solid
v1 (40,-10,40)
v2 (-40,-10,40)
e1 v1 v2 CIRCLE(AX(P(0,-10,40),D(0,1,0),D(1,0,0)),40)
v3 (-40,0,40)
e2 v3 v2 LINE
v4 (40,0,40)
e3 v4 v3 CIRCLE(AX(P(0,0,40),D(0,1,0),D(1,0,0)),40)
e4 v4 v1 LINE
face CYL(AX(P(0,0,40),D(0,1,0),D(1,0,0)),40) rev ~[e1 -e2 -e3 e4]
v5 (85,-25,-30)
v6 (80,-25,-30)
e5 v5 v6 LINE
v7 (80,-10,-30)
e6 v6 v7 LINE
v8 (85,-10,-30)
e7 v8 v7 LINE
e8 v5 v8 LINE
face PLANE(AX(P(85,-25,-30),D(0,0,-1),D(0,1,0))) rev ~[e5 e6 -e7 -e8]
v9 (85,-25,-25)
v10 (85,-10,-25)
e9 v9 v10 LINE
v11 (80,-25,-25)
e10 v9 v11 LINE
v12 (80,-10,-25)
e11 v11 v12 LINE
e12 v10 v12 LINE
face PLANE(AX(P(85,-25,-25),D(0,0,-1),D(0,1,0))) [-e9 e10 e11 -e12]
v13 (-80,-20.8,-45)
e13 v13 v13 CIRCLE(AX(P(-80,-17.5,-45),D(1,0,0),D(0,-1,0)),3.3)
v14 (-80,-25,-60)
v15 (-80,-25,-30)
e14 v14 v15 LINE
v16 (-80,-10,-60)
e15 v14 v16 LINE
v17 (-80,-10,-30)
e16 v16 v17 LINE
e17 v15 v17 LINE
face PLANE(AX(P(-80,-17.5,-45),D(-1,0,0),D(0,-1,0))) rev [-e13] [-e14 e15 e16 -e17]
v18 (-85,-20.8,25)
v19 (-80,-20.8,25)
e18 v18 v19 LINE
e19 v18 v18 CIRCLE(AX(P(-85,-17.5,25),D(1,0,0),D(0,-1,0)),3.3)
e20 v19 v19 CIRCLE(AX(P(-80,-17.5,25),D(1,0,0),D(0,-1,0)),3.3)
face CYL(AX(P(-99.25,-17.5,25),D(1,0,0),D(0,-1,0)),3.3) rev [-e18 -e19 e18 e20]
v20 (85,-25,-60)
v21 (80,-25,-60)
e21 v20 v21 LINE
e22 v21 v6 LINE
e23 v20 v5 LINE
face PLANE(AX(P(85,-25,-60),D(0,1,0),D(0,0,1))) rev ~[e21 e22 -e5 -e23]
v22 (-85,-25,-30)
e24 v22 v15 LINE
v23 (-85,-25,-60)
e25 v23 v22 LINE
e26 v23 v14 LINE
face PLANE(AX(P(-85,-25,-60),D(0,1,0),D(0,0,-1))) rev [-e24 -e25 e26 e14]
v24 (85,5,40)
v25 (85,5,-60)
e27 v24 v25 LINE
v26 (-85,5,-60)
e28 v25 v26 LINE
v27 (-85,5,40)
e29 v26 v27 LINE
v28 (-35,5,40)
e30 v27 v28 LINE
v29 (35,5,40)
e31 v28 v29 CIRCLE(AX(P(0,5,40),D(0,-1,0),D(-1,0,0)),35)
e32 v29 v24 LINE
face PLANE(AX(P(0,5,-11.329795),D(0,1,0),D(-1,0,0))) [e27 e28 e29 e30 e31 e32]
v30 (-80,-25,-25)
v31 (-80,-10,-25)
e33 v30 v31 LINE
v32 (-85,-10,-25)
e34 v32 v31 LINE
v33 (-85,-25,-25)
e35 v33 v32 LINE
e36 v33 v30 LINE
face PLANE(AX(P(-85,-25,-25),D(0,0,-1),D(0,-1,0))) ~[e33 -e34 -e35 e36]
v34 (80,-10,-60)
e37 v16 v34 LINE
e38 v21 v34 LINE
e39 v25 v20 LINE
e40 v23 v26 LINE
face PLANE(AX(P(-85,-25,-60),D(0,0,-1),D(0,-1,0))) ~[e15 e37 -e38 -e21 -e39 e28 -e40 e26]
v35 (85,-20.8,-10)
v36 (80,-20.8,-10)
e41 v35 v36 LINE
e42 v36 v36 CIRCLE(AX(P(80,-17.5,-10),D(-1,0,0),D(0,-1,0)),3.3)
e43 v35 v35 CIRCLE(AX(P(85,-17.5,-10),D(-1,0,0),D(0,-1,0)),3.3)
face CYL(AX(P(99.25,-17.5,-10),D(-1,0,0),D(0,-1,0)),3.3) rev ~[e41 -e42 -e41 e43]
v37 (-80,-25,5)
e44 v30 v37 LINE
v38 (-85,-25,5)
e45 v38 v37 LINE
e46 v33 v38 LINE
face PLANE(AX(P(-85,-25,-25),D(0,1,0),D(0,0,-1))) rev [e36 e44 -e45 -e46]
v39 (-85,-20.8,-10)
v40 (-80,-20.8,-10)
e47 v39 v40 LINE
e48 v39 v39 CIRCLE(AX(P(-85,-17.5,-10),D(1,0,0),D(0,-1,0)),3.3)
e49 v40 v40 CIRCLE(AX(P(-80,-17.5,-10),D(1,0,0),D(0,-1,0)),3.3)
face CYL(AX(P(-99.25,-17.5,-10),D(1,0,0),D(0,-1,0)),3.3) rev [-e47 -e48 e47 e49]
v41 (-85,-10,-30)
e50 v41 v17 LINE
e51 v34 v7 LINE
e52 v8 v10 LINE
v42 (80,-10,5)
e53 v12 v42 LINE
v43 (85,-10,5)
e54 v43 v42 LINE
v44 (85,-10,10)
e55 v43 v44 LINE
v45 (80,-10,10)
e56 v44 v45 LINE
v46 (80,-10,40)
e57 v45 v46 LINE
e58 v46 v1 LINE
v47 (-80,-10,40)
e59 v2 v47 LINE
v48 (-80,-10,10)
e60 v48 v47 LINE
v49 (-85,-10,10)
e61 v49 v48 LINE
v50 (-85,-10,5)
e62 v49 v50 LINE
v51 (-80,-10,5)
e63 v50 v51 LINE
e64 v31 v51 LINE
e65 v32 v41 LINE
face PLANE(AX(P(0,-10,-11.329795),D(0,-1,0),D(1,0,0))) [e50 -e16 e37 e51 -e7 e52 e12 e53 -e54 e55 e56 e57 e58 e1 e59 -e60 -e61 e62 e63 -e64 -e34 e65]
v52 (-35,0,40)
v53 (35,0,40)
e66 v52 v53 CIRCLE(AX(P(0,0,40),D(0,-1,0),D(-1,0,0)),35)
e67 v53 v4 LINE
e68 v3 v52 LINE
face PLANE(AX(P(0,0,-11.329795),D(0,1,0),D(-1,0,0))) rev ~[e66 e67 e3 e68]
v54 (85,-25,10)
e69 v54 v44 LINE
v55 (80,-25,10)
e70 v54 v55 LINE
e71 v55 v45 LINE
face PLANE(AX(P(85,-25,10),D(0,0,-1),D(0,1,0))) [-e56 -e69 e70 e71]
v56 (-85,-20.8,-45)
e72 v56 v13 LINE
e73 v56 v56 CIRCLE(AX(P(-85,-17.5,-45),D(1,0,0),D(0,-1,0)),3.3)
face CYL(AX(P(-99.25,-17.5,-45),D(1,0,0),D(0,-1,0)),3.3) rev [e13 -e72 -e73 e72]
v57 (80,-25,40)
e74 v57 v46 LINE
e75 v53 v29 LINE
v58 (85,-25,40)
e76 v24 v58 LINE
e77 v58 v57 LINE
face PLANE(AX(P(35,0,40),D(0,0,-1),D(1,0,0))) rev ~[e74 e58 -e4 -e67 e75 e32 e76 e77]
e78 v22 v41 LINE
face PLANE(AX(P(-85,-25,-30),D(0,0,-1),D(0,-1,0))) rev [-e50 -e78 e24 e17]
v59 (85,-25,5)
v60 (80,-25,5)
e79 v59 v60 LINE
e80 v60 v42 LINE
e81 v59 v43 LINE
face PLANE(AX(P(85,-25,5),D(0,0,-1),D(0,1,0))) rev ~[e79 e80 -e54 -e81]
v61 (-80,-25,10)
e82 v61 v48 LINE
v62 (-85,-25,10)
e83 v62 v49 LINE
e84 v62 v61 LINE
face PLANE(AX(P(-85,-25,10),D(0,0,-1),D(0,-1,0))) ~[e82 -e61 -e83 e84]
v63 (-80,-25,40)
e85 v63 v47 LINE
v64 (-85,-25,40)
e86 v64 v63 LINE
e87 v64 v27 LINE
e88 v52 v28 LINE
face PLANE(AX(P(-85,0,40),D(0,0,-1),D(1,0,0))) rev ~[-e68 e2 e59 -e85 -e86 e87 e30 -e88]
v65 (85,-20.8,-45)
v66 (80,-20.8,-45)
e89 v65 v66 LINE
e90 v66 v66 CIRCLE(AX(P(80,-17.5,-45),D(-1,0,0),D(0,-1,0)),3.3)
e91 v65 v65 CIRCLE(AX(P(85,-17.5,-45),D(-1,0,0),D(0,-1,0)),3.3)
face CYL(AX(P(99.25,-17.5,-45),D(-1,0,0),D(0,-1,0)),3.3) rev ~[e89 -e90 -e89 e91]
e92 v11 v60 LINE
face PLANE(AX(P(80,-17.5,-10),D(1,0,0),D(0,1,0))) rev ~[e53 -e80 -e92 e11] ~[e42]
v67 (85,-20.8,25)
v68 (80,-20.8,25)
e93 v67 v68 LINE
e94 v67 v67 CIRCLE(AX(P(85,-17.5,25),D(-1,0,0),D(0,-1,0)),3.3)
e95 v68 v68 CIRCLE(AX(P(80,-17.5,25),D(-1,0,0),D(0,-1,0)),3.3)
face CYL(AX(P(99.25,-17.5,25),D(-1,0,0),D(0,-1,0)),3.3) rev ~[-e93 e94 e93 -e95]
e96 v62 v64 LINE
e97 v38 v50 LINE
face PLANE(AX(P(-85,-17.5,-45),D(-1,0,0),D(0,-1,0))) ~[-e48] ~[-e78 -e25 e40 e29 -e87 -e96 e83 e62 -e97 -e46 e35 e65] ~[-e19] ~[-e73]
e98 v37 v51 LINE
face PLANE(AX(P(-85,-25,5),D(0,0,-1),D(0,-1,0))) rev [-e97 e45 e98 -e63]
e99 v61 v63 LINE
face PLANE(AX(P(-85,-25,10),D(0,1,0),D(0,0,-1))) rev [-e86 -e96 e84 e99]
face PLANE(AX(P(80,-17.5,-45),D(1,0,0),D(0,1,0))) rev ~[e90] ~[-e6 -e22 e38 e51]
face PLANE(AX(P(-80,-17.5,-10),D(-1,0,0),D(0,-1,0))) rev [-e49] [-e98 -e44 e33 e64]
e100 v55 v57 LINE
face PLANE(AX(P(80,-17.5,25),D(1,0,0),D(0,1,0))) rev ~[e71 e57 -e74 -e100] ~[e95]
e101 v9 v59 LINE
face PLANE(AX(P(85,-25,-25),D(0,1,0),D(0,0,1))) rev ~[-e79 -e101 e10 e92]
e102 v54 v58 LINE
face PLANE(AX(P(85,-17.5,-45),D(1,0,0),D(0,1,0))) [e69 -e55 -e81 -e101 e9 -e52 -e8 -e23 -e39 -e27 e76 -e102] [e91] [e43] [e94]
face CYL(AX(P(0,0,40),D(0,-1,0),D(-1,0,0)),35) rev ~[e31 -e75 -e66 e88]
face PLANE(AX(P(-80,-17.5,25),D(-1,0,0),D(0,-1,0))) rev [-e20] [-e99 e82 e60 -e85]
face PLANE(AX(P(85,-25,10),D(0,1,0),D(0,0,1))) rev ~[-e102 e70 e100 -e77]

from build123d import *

# Parameters (mm, degrees)
F1_DEPTH = 10
F3_DEPTH = 5
F4_W     = 15
F4_H     = 30
F5_DEPTH = 5
F6_D     = 6.6
F6_DEPTH = 14.25
F6_TIP   = 1.9828400428


# Not quite as in the source:
# - a pattern or mirror of a feature is missing from the dataset's text; its kind, count and spacing are read off the source's solid


with BuildPart() as f1:
    # F0 (on Front) → F1 (new body)
    with BuildSketch(Plane.XZ):
        with BuildLine():
            ThreePointArc((40, 40), (0, 0), (-40, 40))
            Line((-40, 40), (-85, 40))
            Line((-85, 40), (-85, -60))
            Line((-85, -60), (85, -60))
            Line((85, -60), (85, 40))
            Line((85, 40), (40, 40))
        make_face()
    extrude(amount=F1_DEPTH)

    # F2 (on face) → F3 (join)
    with BuildSketch(Plane(origin=(0, 0, 0), x_dir=(-1, 0, 0), z_dir=(0, 1, 0))):
        with BuildLine():
            ThreePointArc((40, 40), (0, 0), (-40, 40))
            Line((-40, 40), (-85, 40))
            Line((-85, 40), (-85, -60))
            Line((-85, -60), (85, -60))
            Line((85, -60), (85, 40))
            Line((85, 40), (40, 40))
        make_face()
        with BuildLine():
            ThreePointArc((35, 40), (0, 5), (-35, 40))
            Line((-35, 40), (-40, 40))
            ThreePointArc((-40, 40), (0, 0), (40, 40))
            Line((40, 40), (35, 40))
        make_face()
    extrude(amount=F3_DEPTH)

    # F4 (on face) → F5 (join)
    with BuildSketch(Plane.YZ.offset(85)):
        with Locations((-17.5, -45)):
            Rectangle(F4_W, F4_H)
        with Locations((-17.5, -10)):
            Rectangle(F4_W, F4_H)
        with Locations((-17.5, 25)):
            Rectangle(F4_W, F4_H)
    f5 = extrude(amount=-F5_DEPTH)

    # F5_copies: F5 across plane
    add(f5.mirror(Plane(origin=(0, 0, 0), x_dir=(0, 0, -1), z_dir=(-1, 0, 0))))

    # F6
    with Locations(Plane.YZ.offset(85)):
        with Locations((-17.5, 25), (-17.5, -10), (-17.5, -45)):
            f6 = Hole(F6_D / 2, depth=F6_DEPTH)
            with Locations((0, 0, -(F6_DEPTH + F6_TIP / 2))):  # 118° drill point
                Cone(0, F6_D / 2, F6_TIP, mode=Mode.SUBTRACT)

    # F6_copies: F6 across plane
    add(f6.mirror(Plane(origin=(0, 0, 0), x_dir=(0, 0, -1), z_dir=(-1, 0, 0))), mode=Mode.SUBTRACT)


solid = f1.part
